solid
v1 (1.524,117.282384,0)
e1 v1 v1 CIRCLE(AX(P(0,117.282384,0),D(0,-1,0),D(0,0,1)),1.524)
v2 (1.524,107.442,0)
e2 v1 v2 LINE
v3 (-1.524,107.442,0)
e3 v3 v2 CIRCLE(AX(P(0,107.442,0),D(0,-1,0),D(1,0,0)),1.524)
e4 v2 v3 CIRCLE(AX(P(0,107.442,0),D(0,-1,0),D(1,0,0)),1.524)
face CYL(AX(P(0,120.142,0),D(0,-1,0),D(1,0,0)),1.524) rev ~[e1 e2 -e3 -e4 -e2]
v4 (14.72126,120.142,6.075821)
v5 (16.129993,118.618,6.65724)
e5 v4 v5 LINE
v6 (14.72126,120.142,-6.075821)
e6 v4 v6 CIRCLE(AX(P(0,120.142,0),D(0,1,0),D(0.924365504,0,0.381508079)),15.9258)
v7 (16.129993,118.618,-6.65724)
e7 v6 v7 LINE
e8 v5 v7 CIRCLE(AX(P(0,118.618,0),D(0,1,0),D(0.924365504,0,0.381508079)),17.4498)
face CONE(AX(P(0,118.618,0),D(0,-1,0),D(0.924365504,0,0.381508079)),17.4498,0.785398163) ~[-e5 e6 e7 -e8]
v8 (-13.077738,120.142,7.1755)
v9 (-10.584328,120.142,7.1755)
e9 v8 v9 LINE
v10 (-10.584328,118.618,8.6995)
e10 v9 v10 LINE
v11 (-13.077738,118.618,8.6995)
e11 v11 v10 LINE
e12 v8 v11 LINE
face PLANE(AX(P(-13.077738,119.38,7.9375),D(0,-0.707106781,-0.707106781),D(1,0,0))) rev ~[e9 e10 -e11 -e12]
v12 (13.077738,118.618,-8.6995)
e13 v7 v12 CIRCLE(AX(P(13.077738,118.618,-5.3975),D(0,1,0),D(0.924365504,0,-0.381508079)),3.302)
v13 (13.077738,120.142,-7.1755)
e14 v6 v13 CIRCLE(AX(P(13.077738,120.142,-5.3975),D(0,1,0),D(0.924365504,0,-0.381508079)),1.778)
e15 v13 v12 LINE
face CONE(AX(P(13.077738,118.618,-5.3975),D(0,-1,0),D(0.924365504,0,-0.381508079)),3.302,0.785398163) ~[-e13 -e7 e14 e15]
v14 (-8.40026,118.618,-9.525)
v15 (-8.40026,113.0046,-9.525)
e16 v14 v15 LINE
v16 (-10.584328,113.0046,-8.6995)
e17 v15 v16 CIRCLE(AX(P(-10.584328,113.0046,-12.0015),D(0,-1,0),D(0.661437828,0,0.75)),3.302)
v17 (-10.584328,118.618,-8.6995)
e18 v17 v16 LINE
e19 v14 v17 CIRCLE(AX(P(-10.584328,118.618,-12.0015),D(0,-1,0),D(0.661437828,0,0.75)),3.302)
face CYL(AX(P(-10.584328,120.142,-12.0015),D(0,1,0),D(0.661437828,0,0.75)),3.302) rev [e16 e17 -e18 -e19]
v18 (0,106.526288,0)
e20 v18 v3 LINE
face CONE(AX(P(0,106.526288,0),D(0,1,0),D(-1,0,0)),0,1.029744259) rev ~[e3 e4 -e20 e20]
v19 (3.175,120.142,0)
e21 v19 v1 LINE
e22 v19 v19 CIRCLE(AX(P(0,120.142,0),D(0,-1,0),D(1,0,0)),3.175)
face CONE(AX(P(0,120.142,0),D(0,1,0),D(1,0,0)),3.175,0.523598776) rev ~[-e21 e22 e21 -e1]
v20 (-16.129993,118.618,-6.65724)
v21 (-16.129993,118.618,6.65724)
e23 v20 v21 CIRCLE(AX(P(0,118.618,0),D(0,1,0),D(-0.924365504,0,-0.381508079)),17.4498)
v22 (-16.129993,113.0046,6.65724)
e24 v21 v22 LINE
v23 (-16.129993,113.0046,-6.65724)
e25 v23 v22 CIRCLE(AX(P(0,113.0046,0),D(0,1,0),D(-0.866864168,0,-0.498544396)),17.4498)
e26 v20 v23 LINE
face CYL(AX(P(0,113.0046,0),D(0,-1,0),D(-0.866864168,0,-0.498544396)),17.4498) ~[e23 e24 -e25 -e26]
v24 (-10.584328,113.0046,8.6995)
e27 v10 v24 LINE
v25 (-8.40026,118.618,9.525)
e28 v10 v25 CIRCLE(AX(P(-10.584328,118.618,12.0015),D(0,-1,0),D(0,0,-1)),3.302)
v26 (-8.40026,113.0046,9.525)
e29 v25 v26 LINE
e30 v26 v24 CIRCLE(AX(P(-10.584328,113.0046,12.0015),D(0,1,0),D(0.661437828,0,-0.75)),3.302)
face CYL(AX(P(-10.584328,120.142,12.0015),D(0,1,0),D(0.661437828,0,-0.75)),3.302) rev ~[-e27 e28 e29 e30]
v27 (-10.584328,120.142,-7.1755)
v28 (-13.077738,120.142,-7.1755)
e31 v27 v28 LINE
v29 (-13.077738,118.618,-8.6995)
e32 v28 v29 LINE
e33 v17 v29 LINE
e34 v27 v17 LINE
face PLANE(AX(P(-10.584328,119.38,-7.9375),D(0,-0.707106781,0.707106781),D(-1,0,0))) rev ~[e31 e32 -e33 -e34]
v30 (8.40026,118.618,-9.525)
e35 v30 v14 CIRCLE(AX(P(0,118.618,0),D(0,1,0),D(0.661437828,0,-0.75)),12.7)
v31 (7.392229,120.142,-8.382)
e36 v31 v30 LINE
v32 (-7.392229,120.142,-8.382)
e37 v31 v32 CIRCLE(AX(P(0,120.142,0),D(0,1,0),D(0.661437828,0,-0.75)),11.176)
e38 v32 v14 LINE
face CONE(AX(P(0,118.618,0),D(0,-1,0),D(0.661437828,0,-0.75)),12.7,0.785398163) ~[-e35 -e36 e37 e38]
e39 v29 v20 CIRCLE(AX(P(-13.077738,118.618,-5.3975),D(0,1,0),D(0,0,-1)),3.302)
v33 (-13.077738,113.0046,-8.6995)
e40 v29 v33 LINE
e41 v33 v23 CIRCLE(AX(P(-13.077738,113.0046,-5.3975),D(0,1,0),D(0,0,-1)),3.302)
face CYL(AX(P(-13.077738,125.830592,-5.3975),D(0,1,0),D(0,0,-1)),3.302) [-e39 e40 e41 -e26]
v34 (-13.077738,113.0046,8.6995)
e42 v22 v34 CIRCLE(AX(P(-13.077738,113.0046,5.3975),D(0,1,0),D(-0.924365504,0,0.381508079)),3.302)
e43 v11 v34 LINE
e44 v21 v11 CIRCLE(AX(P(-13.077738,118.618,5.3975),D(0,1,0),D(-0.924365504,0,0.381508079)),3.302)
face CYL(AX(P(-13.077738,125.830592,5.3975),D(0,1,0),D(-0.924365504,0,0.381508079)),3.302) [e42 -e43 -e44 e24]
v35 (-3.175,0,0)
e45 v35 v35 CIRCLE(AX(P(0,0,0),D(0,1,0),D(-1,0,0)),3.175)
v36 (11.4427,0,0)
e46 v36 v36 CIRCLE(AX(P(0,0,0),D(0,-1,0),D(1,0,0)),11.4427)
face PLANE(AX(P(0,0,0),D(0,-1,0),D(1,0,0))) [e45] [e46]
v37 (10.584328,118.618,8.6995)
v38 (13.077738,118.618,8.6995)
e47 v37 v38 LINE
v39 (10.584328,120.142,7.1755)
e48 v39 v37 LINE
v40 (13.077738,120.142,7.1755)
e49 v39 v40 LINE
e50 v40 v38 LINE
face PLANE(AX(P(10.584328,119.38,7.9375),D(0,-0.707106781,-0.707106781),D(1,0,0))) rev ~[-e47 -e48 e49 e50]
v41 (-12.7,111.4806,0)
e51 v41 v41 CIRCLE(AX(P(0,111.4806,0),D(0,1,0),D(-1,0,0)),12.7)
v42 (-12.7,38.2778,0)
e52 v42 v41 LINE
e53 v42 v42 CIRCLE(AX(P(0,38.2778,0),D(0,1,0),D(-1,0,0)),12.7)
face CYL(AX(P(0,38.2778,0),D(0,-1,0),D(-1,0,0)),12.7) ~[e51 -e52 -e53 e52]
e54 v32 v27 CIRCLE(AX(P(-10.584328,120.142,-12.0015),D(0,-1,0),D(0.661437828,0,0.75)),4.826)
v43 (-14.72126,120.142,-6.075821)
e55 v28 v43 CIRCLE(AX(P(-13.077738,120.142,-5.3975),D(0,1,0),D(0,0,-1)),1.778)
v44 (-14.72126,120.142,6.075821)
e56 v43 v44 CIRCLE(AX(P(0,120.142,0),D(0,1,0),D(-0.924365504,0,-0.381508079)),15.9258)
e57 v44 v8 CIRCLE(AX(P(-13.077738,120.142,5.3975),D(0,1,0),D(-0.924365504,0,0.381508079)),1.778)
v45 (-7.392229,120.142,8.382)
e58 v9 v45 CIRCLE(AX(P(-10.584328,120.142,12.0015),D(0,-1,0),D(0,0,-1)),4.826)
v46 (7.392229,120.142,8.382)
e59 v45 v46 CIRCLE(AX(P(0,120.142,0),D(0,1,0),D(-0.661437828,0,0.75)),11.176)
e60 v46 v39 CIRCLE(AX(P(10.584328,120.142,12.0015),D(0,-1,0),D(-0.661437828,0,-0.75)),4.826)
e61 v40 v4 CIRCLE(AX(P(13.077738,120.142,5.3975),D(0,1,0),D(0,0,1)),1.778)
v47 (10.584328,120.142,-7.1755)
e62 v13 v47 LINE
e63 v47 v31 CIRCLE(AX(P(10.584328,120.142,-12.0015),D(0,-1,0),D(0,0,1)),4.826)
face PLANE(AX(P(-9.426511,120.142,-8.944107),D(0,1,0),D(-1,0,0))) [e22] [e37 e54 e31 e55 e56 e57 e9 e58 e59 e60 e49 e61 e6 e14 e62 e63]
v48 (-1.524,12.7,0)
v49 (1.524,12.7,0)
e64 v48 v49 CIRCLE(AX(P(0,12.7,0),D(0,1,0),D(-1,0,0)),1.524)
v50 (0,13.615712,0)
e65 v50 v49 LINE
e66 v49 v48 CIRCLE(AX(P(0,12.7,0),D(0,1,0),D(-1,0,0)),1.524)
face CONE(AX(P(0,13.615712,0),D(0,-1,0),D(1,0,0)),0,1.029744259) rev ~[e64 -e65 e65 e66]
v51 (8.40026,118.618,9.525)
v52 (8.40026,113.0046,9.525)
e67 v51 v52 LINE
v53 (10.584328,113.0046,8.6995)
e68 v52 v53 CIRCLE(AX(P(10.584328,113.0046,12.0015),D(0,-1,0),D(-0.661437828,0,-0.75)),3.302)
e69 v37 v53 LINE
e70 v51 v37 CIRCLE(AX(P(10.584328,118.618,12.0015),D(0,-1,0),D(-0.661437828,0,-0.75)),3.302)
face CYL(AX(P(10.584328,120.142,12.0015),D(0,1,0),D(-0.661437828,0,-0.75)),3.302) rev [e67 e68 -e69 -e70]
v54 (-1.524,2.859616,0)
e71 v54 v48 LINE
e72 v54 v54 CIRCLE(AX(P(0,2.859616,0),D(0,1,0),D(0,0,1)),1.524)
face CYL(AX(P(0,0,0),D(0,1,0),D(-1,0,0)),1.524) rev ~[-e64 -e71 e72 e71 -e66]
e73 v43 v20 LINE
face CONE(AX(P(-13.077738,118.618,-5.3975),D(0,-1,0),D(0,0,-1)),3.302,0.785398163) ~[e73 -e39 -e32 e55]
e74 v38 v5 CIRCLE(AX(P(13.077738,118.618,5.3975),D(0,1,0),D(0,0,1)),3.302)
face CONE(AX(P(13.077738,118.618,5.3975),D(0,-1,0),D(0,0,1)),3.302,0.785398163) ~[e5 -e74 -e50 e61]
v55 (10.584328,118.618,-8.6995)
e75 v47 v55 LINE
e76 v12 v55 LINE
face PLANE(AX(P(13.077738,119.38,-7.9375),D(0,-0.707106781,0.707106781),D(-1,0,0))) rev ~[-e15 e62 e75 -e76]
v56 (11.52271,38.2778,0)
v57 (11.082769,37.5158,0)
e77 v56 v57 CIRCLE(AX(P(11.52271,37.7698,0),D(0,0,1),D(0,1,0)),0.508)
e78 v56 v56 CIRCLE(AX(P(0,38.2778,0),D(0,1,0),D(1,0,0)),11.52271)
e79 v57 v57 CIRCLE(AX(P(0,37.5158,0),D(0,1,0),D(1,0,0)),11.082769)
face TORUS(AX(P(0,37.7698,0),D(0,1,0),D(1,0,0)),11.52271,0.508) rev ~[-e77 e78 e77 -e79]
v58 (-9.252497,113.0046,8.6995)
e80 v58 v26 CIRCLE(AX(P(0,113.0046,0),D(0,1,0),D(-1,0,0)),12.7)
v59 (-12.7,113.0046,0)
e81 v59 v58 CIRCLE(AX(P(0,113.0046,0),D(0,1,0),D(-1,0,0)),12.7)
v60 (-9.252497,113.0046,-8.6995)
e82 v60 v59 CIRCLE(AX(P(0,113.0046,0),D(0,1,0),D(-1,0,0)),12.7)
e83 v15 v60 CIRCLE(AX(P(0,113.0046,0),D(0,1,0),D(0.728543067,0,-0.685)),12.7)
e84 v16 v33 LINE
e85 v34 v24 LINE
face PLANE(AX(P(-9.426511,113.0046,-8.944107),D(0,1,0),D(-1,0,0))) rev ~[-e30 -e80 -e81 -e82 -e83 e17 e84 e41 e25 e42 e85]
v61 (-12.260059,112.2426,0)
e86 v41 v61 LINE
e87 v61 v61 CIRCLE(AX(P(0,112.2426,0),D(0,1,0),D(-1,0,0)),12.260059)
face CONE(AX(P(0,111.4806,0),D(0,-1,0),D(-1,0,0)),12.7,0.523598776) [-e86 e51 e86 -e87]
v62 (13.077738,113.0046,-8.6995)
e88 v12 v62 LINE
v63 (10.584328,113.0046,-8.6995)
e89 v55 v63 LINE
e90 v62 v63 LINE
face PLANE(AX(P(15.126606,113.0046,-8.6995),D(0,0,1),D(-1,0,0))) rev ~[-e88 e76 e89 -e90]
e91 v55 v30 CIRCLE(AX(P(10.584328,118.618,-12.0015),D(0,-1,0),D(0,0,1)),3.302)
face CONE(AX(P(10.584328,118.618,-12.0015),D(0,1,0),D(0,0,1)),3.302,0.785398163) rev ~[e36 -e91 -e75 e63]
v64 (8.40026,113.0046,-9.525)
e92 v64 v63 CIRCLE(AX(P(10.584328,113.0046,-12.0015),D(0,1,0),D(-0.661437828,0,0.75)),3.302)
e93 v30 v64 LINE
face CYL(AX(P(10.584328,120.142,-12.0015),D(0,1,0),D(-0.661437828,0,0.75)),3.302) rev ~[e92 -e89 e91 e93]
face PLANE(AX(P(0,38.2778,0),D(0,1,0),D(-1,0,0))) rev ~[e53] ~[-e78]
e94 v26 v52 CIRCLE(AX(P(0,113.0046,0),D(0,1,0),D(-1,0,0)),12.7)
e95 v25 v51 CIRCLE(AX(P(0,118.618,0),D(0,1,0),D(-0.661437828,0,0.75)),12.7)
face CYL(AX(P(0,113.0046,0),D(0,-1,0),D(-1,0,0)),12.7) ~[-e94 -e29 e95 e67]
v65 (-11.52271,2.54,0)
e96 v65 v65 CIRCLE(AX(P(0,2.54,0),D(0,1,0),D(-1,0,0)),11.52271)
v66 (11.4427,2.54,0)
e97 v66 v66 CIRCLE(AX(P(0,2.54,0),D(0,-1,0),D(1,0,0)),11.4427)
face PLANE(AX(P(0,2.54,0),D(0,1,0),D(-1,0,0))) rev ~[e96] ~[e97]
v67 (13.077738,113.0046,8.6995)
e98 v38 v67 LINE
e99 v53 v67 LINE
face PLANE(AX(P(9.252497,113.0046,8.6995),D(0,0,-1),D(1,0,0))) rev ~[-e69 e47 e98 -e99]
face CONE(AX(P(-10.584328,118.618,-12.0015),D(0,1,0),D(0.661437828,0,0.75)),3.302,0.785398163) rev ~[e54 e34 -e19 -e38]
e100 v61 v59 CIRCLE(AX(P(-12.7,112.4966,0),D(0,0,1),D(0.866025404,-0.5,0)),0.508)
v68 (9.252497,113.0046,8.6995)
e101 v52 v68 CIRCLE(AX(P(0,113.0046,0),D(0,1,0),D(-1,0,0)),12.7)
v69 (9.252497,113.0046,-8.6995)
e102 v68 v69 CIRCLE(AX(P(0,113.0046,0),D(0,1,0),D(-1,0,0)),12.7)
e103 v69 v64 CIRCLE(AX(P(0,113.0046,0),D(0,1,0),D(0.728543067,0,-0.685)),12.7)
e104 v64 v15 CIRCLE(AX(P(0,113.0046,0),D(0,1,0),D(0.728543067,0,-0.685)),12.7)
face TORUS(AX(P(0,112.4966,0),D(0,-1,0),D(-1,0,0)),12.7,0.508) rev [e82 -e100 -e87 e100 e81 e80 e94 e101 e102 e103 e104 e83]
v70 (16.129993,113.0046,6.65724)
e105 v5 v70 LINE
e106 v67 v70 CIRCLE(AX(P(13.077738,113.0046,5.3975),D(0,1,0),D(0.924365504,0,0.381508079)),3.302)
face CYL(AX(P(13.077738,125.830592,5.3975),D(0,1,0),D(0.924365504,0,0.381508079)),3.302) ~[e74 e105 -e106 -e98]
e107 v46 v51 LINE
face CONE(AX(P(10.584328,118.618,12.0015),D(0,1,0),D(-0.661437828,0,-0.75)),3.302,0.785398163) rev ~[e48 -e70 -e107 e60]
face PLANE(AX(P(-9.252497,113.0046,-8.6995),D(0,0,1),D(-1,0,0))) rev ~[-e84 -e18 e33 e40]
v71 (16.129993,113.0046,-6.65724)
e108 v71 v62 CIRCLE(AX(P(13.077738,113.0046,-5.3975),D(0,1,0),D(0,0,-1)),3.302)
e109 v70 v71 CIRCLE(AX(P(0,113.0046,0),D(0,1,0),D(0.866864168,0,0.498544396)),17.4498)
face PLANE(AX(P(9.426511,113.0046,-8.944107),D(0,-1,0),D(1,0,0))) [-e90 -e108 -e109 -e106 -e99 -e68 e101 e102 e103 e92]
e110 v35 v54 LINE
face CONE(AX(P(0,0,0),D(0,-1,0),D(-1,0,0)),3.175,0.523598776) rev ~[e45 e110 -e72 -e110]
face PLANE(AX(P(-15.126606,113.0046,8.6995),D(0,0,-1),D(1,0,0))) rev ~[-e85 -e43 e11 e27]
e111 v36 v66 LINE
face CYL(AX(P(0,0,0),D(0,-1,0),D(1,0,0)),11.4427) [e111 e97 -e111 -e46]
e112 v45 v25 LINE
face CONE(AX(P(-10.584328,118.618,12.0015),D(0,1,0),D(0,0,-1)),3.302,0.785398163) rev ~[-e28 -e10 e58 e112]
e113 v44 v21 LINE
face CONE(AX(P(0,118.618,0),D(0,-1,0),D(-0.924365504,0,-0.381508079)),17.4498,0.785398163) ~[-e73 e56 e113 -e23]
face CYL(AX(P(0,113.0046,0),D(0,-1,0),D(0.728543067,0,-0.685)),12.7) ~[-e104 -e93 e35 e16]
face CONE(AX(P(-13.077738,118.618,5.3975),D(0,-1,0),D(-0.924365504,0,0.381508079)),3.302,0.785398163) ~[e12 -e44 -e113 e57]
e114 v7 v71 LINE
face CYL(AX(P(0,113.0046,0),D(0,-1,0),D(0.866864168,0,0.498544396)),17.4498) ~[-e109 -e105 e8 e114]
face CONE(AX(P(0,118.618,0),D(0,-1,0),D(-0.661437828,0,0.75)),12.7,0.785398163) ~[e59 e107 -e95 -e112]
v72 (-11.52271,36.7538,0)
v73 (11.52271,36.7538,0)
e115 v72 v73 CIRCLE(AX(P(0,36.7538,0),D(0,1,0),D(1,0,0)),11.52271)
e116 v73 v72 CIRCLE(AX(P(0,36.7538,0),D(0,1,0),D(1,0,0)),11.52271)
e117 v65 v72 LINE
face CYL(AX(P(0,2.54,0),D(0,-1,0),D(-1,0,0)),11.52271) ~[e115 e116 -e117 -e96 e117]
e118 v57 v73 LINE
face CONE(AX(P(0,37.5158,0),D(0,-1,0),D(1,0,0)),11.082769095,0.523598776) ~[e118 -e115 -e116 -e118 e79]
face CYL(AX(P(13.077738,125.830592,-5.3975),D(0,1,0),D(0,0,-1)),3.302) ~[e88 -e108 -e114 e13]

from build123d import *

# Parameters (mm, degrees)
F0_R            = 11.4427
F1_DEPTH        = 2.54
F2_R            = 11.52271
F3_DEPTH        = 35.7378
F4_R            = 12.7
F4_R_2          = 11.52271
F5_DEPTH        = 74.7268
F7_DEPTH        = 7.1374
F8_T1_DEPTH     = 7.1374
F8_T3_DEPTH     = 18.5145836873
F9_SIZE         = 1.524
F13_D           = 3.048
F13_DEPTH       = 12.7
F13_CSINK_D     = 6.35
F13_CSINK_ANGLE = 60
F13_TIP         = 0.9157115834
F15_D           = 3.048
F15_DEPTH       = 12.7
F15_CSINK_D     = 6.35
F15_CSINK_ANGLE = 60
F15_TIP         = 0.9157115834


# Not quite as in the source:
# - a fillet or chamfer that OpenCascade refuses, or shapes differently, is made with other operations: its cross-section is extruded or revolved along the edge and cut away or added


with BuildPart() as f1:
    # F0 (on Front) → F1 (new body)
    with BuildSketch(Plane.XZ):
        Circle(F0_R)
    extrude(amount=-F1_DEPTH)

    # F2 (on face) → F3 (join)
    with BuildSketch(Plane(origin=(0, 2.54, 0), x_dir=(-1, 0, 0), z_dir=(0, 1, 0))):
        Circle(F2_R)
    extrude(amount=F3_DEPTH)

    # F4 (on face) → F5 (join)
    with BuildSketch(Plane(origin=(0, 38.2778, 0), x_dir=(-1, 0, 0), z_dir=(0, 1, 0))):
        Circle(F4_R)
        Circle(F4_R_2, mode=Mode.SUBTRACT)
        Circle(F4_R_2)
    extrude(amount=F5_DEPTH)

    # F6 (on face) → F7 (join)
    with BuildSketch(Plane(origin=(0, 113.0046, 0), x_dir=(-1, 0, 0), z_dir=(0, 1, 0))):
        with BuildLine():
            ThreePointArc((12.7, 0), (11.8067080769, 4.678850755), (9.2524969468, 8.6995))
            ThreePointArc((9.2524969468, 8.6995), (0, 12.7), (-9.2524969468, 8.6995))
            ThreePointArc((-9.2524969468, 8.6995), (-12.7, 0), (-9.2524969468, -8.6995))
            ThreePointArc((-9.2524969468, -8.6995), (0, -12.7), (9.2524969468, -8.6995))
            ThreePointArc((9.2524969468, -8.6995), (11.8067080769, -4.678850755), (12.7, 0))
        make_face()
        with BuildLine():
            ThreePointArc((15.126606354, -8.6995), (17.4498, 0), (15.126606354, 8.6995))
            Line((15.126606354, 8.6995), (9.2524969468, 8.6995))
            ThreePointArc((9.2524969468, 8.6995), (11.8067080769, 4.678850755), (12.7, 0))
            ThreePointArc((12.7, 0), (11.8067080769, -4.678850755), (9.2524969468, -8.6995))
            Line((9.2524969468, -8.6995), (15.126606354, -8.6995))
        make_face()
        with BuildLine():
            ThreePointArc((-9.2524969468, -8.6995), (-12.7, 0), (-9.2524969468, 8.6995))
            Line((-9.2524969468, 8.6995), (-15.126606354, 8.6995))
            ThreePointArc((-15.126606354, 8.6995), (-17.4498, 0), (-15.126606354, -8.6995))
            Line((-15.126606354, -8.6995), (-9.2524969468, -8.6995))
        make_face()
    extrude(amount=F7_DEPTH)

    # F8: fillet of radius 3.302 on 8 edges, made by hand

    # F8_s2 → F8_t1 (join)
    with BuildSketch(Plane.XZ.offset(-120.142)):
        with BuildLine():
            ThreePointArc((-8.4002604126, -9.525), (-9.4168948242, -8.9127618272), (-10.5843281199, -8.6995))
            Line((-10.5843281199, -8.6995), (-9.2524969468, -8.6995))
            ThreePointArc((-9.2524969468, -8.6995), (-8.8360241715, -9.1222078928), (-8.4002604126, -9.525))
        make_face()
        with BuildLine():
            ThreePointArc((8.4002604126, -9.525), (9.4168948242, -8.9127618272), (10.5843281199, -8.6995))
            Line((10.5843281199, -8.6995), (9.2524969468, -8.6995))
            ThreePointArc((9.2524969468, -8.6995), (8.8360241715, -9.1222078928), (8.4002604126, -9.525))
        make_face()
        with BuildLine():
            ThreePointArc((-8.4002604126, 9.525), (-9.4168948242, 8.9127618272), (-10.5843281199, 8.6995))
            Line((-10.5843281199, 8.6995), (-9.2524969468, 8.6995))
            ThreePointArc((-9.2524969468, 8.6995), (-8.8360241715, 9.1222078928), (-8.4002604126, 9.525))
        make_face()
        with BuildLine():
            ThreePointArc((8.4002604126, 9.525), (9.4168948242, 8.9127618272), (10.5843281199, 8.6995))
            Line((10.5843281199, 8.6995), (9.2524969468, 8.6995))
            ThreePointArc((9.2524969468, 8.6995), (8.8360241715, 9.1222078928), (8.4002604126, 9.525))
        make_face()
    extrude(amount=F8_T1_DEPTH)

    # F8_s4 → F8_t3 (cut)
    with BuildSketch(Plane.XZ.offset(-125.8305918437)):
        with BuildLine():
            ThreePointArc((-13.0777382827, -8.6995), (-14.913976773, -8.1418454969), (-16.1299931781, -6.6572396768))
            ThreePointArc((-16.1299931781, -6.6572396768), (-15.6616238106, -7.6947423385), (-15.126606354, -8.6995))
            Line((-15.126606354, -8.6995), (-13.0777382827, -8.6995))
        make_face()
        with BuildLine():
            ThreePointArc((13.0777382827, -8.6995), (14.913976773, -8.1418454969), (16.1299931781, -6.6572396768))
            ThreePointArc((16.1299931781, -6.6572396768), (15.6616238106, -7.6947423385), (15.126606354, -8.6995))
            Line((15.126606354, -8.6995), (13.0777382827, -8.6995))
        make_face()
        with BuildLine():
            ThreePointArc((-16.1299931781, 6.6572396768), (-14.913976773, 8.1418454969), (-13.0777382827, 8.6995))
            Line((-13.0777382827, 8.6995), (-15.126606354, 8.6995))
            ThreePointArc((-15.126606354, 8.6995), (-15.6616238106, 7.6947423385), (-16.1299931781, 6.6572396768))
        make_face()
        with BuildLine():
            ThreePointArc((16.1299931781, 6.6572396768), (14.913976773, 8.1418454969), (13.0777382827, 8.6995))
            Line((13.0777382827, 8.6995), (15.126606354, 8.6995))
            ThreePointArc((15.126606354, 8.6995), (15.6616238106, 7.6947423385), (16.1299931781, 6.6572396768))
        make_face()
    extrude(amount=F8_T3_DEPTH, mode=Mode.SUBTRACT)

    # F9
    f9_edges = [f1.edges().sort_by_distance(p)[0] for p in [
        (0, 120.142, 12.7),
        (0, 120.142, -12.7),
        (-9.416895, 120.142, -8.912762),
        (9.416895, 120.142, -8.912762),
        (11.831033, 120.142, -8.6995),
        (14.913977, 120.142, -8.141845),
        (17.4498, 120.142, 0),
        (14.913977, 120.142, 8.141845),
        (11.831033, 120.142, 8.6995),
        (9.416895, 120.142, 8.912762),
        (-9.416895, 120.142, 8.912762),
        (-11.831033, 120.142, 8.6995),
        (-14.913977, 120.142, 8.141845),
        (-17.4498, 120.142, 0),
        (-14.913977, 120.142, -8.141845),
        (-11.831033, 120.142, -8.6995),
    ]]
    chamfer(f9_edges, length=F9_SIZE)

    # F10 (on Top) → F11 (revolve, cut)
    with BuildSketch(Plane.XY):
        with BuildLine():
            Line((-12.7, 113.0046), (-12.7, 111.4806))
            Line((-12.7, 111.4806), (-12.2600590949, 112.2426))
            ThreePointArc((-12.2600590949, 112.2426), (-12.2600590949, 112.7506), (-12.7, 113.0046))
        make_face()
        with BuildLine():
            Line((11.52271, 36.7538), (11.52271, 38.2778))
            ThreePointArc((11.52271, 38.2778), (11.0827690949, 38.0238), (11.0827690949, 37.5158))
            Line((11.0827690949, 37.5158), (11.52271, 36.7538))
        make_face()
    revolve(axis=Axis((0, 32.0415347815, 0), (0, 1, 0)), mode=Mode.SUBTRACT)

    # F13
    with Locations(Plane.XZ):
        with Locations((0, 0)):
            CounterSinkHole(F13_D / 2, F13_CSINK_D / 2, depth=F13_DEPTH, counter_sink_angle=F13_CSINK_ANGLE)
            with Locations((0, 0, -(F13_DEPTH + F13_TIP / 2))):  # 118° drill point
                Cone(0, F13_D / 2, F13_TIP, mode=Mode.SUBTRACT)

    # F15
    with Locations(Plane(origin=(0, 120.142, 0), x_dir=(-1, 0, 0), z_dir=(0, 1, 0))):
        with Locations((0, 0)):
            CounterSinkHole(F15_D / 2, F15_CSINK_D / 2, depth=F15_DEPTH, counter_sink_angle=F15_CSINK_ANGLE)
            with Locations((0, 0, -(F15_DEPTH + F15_TIP / 2))):  # 118° drill point
                Cone(0, F15_D / 2, F15_TIP, mode=Mode.SUBTRACT)


solid = f1.part
